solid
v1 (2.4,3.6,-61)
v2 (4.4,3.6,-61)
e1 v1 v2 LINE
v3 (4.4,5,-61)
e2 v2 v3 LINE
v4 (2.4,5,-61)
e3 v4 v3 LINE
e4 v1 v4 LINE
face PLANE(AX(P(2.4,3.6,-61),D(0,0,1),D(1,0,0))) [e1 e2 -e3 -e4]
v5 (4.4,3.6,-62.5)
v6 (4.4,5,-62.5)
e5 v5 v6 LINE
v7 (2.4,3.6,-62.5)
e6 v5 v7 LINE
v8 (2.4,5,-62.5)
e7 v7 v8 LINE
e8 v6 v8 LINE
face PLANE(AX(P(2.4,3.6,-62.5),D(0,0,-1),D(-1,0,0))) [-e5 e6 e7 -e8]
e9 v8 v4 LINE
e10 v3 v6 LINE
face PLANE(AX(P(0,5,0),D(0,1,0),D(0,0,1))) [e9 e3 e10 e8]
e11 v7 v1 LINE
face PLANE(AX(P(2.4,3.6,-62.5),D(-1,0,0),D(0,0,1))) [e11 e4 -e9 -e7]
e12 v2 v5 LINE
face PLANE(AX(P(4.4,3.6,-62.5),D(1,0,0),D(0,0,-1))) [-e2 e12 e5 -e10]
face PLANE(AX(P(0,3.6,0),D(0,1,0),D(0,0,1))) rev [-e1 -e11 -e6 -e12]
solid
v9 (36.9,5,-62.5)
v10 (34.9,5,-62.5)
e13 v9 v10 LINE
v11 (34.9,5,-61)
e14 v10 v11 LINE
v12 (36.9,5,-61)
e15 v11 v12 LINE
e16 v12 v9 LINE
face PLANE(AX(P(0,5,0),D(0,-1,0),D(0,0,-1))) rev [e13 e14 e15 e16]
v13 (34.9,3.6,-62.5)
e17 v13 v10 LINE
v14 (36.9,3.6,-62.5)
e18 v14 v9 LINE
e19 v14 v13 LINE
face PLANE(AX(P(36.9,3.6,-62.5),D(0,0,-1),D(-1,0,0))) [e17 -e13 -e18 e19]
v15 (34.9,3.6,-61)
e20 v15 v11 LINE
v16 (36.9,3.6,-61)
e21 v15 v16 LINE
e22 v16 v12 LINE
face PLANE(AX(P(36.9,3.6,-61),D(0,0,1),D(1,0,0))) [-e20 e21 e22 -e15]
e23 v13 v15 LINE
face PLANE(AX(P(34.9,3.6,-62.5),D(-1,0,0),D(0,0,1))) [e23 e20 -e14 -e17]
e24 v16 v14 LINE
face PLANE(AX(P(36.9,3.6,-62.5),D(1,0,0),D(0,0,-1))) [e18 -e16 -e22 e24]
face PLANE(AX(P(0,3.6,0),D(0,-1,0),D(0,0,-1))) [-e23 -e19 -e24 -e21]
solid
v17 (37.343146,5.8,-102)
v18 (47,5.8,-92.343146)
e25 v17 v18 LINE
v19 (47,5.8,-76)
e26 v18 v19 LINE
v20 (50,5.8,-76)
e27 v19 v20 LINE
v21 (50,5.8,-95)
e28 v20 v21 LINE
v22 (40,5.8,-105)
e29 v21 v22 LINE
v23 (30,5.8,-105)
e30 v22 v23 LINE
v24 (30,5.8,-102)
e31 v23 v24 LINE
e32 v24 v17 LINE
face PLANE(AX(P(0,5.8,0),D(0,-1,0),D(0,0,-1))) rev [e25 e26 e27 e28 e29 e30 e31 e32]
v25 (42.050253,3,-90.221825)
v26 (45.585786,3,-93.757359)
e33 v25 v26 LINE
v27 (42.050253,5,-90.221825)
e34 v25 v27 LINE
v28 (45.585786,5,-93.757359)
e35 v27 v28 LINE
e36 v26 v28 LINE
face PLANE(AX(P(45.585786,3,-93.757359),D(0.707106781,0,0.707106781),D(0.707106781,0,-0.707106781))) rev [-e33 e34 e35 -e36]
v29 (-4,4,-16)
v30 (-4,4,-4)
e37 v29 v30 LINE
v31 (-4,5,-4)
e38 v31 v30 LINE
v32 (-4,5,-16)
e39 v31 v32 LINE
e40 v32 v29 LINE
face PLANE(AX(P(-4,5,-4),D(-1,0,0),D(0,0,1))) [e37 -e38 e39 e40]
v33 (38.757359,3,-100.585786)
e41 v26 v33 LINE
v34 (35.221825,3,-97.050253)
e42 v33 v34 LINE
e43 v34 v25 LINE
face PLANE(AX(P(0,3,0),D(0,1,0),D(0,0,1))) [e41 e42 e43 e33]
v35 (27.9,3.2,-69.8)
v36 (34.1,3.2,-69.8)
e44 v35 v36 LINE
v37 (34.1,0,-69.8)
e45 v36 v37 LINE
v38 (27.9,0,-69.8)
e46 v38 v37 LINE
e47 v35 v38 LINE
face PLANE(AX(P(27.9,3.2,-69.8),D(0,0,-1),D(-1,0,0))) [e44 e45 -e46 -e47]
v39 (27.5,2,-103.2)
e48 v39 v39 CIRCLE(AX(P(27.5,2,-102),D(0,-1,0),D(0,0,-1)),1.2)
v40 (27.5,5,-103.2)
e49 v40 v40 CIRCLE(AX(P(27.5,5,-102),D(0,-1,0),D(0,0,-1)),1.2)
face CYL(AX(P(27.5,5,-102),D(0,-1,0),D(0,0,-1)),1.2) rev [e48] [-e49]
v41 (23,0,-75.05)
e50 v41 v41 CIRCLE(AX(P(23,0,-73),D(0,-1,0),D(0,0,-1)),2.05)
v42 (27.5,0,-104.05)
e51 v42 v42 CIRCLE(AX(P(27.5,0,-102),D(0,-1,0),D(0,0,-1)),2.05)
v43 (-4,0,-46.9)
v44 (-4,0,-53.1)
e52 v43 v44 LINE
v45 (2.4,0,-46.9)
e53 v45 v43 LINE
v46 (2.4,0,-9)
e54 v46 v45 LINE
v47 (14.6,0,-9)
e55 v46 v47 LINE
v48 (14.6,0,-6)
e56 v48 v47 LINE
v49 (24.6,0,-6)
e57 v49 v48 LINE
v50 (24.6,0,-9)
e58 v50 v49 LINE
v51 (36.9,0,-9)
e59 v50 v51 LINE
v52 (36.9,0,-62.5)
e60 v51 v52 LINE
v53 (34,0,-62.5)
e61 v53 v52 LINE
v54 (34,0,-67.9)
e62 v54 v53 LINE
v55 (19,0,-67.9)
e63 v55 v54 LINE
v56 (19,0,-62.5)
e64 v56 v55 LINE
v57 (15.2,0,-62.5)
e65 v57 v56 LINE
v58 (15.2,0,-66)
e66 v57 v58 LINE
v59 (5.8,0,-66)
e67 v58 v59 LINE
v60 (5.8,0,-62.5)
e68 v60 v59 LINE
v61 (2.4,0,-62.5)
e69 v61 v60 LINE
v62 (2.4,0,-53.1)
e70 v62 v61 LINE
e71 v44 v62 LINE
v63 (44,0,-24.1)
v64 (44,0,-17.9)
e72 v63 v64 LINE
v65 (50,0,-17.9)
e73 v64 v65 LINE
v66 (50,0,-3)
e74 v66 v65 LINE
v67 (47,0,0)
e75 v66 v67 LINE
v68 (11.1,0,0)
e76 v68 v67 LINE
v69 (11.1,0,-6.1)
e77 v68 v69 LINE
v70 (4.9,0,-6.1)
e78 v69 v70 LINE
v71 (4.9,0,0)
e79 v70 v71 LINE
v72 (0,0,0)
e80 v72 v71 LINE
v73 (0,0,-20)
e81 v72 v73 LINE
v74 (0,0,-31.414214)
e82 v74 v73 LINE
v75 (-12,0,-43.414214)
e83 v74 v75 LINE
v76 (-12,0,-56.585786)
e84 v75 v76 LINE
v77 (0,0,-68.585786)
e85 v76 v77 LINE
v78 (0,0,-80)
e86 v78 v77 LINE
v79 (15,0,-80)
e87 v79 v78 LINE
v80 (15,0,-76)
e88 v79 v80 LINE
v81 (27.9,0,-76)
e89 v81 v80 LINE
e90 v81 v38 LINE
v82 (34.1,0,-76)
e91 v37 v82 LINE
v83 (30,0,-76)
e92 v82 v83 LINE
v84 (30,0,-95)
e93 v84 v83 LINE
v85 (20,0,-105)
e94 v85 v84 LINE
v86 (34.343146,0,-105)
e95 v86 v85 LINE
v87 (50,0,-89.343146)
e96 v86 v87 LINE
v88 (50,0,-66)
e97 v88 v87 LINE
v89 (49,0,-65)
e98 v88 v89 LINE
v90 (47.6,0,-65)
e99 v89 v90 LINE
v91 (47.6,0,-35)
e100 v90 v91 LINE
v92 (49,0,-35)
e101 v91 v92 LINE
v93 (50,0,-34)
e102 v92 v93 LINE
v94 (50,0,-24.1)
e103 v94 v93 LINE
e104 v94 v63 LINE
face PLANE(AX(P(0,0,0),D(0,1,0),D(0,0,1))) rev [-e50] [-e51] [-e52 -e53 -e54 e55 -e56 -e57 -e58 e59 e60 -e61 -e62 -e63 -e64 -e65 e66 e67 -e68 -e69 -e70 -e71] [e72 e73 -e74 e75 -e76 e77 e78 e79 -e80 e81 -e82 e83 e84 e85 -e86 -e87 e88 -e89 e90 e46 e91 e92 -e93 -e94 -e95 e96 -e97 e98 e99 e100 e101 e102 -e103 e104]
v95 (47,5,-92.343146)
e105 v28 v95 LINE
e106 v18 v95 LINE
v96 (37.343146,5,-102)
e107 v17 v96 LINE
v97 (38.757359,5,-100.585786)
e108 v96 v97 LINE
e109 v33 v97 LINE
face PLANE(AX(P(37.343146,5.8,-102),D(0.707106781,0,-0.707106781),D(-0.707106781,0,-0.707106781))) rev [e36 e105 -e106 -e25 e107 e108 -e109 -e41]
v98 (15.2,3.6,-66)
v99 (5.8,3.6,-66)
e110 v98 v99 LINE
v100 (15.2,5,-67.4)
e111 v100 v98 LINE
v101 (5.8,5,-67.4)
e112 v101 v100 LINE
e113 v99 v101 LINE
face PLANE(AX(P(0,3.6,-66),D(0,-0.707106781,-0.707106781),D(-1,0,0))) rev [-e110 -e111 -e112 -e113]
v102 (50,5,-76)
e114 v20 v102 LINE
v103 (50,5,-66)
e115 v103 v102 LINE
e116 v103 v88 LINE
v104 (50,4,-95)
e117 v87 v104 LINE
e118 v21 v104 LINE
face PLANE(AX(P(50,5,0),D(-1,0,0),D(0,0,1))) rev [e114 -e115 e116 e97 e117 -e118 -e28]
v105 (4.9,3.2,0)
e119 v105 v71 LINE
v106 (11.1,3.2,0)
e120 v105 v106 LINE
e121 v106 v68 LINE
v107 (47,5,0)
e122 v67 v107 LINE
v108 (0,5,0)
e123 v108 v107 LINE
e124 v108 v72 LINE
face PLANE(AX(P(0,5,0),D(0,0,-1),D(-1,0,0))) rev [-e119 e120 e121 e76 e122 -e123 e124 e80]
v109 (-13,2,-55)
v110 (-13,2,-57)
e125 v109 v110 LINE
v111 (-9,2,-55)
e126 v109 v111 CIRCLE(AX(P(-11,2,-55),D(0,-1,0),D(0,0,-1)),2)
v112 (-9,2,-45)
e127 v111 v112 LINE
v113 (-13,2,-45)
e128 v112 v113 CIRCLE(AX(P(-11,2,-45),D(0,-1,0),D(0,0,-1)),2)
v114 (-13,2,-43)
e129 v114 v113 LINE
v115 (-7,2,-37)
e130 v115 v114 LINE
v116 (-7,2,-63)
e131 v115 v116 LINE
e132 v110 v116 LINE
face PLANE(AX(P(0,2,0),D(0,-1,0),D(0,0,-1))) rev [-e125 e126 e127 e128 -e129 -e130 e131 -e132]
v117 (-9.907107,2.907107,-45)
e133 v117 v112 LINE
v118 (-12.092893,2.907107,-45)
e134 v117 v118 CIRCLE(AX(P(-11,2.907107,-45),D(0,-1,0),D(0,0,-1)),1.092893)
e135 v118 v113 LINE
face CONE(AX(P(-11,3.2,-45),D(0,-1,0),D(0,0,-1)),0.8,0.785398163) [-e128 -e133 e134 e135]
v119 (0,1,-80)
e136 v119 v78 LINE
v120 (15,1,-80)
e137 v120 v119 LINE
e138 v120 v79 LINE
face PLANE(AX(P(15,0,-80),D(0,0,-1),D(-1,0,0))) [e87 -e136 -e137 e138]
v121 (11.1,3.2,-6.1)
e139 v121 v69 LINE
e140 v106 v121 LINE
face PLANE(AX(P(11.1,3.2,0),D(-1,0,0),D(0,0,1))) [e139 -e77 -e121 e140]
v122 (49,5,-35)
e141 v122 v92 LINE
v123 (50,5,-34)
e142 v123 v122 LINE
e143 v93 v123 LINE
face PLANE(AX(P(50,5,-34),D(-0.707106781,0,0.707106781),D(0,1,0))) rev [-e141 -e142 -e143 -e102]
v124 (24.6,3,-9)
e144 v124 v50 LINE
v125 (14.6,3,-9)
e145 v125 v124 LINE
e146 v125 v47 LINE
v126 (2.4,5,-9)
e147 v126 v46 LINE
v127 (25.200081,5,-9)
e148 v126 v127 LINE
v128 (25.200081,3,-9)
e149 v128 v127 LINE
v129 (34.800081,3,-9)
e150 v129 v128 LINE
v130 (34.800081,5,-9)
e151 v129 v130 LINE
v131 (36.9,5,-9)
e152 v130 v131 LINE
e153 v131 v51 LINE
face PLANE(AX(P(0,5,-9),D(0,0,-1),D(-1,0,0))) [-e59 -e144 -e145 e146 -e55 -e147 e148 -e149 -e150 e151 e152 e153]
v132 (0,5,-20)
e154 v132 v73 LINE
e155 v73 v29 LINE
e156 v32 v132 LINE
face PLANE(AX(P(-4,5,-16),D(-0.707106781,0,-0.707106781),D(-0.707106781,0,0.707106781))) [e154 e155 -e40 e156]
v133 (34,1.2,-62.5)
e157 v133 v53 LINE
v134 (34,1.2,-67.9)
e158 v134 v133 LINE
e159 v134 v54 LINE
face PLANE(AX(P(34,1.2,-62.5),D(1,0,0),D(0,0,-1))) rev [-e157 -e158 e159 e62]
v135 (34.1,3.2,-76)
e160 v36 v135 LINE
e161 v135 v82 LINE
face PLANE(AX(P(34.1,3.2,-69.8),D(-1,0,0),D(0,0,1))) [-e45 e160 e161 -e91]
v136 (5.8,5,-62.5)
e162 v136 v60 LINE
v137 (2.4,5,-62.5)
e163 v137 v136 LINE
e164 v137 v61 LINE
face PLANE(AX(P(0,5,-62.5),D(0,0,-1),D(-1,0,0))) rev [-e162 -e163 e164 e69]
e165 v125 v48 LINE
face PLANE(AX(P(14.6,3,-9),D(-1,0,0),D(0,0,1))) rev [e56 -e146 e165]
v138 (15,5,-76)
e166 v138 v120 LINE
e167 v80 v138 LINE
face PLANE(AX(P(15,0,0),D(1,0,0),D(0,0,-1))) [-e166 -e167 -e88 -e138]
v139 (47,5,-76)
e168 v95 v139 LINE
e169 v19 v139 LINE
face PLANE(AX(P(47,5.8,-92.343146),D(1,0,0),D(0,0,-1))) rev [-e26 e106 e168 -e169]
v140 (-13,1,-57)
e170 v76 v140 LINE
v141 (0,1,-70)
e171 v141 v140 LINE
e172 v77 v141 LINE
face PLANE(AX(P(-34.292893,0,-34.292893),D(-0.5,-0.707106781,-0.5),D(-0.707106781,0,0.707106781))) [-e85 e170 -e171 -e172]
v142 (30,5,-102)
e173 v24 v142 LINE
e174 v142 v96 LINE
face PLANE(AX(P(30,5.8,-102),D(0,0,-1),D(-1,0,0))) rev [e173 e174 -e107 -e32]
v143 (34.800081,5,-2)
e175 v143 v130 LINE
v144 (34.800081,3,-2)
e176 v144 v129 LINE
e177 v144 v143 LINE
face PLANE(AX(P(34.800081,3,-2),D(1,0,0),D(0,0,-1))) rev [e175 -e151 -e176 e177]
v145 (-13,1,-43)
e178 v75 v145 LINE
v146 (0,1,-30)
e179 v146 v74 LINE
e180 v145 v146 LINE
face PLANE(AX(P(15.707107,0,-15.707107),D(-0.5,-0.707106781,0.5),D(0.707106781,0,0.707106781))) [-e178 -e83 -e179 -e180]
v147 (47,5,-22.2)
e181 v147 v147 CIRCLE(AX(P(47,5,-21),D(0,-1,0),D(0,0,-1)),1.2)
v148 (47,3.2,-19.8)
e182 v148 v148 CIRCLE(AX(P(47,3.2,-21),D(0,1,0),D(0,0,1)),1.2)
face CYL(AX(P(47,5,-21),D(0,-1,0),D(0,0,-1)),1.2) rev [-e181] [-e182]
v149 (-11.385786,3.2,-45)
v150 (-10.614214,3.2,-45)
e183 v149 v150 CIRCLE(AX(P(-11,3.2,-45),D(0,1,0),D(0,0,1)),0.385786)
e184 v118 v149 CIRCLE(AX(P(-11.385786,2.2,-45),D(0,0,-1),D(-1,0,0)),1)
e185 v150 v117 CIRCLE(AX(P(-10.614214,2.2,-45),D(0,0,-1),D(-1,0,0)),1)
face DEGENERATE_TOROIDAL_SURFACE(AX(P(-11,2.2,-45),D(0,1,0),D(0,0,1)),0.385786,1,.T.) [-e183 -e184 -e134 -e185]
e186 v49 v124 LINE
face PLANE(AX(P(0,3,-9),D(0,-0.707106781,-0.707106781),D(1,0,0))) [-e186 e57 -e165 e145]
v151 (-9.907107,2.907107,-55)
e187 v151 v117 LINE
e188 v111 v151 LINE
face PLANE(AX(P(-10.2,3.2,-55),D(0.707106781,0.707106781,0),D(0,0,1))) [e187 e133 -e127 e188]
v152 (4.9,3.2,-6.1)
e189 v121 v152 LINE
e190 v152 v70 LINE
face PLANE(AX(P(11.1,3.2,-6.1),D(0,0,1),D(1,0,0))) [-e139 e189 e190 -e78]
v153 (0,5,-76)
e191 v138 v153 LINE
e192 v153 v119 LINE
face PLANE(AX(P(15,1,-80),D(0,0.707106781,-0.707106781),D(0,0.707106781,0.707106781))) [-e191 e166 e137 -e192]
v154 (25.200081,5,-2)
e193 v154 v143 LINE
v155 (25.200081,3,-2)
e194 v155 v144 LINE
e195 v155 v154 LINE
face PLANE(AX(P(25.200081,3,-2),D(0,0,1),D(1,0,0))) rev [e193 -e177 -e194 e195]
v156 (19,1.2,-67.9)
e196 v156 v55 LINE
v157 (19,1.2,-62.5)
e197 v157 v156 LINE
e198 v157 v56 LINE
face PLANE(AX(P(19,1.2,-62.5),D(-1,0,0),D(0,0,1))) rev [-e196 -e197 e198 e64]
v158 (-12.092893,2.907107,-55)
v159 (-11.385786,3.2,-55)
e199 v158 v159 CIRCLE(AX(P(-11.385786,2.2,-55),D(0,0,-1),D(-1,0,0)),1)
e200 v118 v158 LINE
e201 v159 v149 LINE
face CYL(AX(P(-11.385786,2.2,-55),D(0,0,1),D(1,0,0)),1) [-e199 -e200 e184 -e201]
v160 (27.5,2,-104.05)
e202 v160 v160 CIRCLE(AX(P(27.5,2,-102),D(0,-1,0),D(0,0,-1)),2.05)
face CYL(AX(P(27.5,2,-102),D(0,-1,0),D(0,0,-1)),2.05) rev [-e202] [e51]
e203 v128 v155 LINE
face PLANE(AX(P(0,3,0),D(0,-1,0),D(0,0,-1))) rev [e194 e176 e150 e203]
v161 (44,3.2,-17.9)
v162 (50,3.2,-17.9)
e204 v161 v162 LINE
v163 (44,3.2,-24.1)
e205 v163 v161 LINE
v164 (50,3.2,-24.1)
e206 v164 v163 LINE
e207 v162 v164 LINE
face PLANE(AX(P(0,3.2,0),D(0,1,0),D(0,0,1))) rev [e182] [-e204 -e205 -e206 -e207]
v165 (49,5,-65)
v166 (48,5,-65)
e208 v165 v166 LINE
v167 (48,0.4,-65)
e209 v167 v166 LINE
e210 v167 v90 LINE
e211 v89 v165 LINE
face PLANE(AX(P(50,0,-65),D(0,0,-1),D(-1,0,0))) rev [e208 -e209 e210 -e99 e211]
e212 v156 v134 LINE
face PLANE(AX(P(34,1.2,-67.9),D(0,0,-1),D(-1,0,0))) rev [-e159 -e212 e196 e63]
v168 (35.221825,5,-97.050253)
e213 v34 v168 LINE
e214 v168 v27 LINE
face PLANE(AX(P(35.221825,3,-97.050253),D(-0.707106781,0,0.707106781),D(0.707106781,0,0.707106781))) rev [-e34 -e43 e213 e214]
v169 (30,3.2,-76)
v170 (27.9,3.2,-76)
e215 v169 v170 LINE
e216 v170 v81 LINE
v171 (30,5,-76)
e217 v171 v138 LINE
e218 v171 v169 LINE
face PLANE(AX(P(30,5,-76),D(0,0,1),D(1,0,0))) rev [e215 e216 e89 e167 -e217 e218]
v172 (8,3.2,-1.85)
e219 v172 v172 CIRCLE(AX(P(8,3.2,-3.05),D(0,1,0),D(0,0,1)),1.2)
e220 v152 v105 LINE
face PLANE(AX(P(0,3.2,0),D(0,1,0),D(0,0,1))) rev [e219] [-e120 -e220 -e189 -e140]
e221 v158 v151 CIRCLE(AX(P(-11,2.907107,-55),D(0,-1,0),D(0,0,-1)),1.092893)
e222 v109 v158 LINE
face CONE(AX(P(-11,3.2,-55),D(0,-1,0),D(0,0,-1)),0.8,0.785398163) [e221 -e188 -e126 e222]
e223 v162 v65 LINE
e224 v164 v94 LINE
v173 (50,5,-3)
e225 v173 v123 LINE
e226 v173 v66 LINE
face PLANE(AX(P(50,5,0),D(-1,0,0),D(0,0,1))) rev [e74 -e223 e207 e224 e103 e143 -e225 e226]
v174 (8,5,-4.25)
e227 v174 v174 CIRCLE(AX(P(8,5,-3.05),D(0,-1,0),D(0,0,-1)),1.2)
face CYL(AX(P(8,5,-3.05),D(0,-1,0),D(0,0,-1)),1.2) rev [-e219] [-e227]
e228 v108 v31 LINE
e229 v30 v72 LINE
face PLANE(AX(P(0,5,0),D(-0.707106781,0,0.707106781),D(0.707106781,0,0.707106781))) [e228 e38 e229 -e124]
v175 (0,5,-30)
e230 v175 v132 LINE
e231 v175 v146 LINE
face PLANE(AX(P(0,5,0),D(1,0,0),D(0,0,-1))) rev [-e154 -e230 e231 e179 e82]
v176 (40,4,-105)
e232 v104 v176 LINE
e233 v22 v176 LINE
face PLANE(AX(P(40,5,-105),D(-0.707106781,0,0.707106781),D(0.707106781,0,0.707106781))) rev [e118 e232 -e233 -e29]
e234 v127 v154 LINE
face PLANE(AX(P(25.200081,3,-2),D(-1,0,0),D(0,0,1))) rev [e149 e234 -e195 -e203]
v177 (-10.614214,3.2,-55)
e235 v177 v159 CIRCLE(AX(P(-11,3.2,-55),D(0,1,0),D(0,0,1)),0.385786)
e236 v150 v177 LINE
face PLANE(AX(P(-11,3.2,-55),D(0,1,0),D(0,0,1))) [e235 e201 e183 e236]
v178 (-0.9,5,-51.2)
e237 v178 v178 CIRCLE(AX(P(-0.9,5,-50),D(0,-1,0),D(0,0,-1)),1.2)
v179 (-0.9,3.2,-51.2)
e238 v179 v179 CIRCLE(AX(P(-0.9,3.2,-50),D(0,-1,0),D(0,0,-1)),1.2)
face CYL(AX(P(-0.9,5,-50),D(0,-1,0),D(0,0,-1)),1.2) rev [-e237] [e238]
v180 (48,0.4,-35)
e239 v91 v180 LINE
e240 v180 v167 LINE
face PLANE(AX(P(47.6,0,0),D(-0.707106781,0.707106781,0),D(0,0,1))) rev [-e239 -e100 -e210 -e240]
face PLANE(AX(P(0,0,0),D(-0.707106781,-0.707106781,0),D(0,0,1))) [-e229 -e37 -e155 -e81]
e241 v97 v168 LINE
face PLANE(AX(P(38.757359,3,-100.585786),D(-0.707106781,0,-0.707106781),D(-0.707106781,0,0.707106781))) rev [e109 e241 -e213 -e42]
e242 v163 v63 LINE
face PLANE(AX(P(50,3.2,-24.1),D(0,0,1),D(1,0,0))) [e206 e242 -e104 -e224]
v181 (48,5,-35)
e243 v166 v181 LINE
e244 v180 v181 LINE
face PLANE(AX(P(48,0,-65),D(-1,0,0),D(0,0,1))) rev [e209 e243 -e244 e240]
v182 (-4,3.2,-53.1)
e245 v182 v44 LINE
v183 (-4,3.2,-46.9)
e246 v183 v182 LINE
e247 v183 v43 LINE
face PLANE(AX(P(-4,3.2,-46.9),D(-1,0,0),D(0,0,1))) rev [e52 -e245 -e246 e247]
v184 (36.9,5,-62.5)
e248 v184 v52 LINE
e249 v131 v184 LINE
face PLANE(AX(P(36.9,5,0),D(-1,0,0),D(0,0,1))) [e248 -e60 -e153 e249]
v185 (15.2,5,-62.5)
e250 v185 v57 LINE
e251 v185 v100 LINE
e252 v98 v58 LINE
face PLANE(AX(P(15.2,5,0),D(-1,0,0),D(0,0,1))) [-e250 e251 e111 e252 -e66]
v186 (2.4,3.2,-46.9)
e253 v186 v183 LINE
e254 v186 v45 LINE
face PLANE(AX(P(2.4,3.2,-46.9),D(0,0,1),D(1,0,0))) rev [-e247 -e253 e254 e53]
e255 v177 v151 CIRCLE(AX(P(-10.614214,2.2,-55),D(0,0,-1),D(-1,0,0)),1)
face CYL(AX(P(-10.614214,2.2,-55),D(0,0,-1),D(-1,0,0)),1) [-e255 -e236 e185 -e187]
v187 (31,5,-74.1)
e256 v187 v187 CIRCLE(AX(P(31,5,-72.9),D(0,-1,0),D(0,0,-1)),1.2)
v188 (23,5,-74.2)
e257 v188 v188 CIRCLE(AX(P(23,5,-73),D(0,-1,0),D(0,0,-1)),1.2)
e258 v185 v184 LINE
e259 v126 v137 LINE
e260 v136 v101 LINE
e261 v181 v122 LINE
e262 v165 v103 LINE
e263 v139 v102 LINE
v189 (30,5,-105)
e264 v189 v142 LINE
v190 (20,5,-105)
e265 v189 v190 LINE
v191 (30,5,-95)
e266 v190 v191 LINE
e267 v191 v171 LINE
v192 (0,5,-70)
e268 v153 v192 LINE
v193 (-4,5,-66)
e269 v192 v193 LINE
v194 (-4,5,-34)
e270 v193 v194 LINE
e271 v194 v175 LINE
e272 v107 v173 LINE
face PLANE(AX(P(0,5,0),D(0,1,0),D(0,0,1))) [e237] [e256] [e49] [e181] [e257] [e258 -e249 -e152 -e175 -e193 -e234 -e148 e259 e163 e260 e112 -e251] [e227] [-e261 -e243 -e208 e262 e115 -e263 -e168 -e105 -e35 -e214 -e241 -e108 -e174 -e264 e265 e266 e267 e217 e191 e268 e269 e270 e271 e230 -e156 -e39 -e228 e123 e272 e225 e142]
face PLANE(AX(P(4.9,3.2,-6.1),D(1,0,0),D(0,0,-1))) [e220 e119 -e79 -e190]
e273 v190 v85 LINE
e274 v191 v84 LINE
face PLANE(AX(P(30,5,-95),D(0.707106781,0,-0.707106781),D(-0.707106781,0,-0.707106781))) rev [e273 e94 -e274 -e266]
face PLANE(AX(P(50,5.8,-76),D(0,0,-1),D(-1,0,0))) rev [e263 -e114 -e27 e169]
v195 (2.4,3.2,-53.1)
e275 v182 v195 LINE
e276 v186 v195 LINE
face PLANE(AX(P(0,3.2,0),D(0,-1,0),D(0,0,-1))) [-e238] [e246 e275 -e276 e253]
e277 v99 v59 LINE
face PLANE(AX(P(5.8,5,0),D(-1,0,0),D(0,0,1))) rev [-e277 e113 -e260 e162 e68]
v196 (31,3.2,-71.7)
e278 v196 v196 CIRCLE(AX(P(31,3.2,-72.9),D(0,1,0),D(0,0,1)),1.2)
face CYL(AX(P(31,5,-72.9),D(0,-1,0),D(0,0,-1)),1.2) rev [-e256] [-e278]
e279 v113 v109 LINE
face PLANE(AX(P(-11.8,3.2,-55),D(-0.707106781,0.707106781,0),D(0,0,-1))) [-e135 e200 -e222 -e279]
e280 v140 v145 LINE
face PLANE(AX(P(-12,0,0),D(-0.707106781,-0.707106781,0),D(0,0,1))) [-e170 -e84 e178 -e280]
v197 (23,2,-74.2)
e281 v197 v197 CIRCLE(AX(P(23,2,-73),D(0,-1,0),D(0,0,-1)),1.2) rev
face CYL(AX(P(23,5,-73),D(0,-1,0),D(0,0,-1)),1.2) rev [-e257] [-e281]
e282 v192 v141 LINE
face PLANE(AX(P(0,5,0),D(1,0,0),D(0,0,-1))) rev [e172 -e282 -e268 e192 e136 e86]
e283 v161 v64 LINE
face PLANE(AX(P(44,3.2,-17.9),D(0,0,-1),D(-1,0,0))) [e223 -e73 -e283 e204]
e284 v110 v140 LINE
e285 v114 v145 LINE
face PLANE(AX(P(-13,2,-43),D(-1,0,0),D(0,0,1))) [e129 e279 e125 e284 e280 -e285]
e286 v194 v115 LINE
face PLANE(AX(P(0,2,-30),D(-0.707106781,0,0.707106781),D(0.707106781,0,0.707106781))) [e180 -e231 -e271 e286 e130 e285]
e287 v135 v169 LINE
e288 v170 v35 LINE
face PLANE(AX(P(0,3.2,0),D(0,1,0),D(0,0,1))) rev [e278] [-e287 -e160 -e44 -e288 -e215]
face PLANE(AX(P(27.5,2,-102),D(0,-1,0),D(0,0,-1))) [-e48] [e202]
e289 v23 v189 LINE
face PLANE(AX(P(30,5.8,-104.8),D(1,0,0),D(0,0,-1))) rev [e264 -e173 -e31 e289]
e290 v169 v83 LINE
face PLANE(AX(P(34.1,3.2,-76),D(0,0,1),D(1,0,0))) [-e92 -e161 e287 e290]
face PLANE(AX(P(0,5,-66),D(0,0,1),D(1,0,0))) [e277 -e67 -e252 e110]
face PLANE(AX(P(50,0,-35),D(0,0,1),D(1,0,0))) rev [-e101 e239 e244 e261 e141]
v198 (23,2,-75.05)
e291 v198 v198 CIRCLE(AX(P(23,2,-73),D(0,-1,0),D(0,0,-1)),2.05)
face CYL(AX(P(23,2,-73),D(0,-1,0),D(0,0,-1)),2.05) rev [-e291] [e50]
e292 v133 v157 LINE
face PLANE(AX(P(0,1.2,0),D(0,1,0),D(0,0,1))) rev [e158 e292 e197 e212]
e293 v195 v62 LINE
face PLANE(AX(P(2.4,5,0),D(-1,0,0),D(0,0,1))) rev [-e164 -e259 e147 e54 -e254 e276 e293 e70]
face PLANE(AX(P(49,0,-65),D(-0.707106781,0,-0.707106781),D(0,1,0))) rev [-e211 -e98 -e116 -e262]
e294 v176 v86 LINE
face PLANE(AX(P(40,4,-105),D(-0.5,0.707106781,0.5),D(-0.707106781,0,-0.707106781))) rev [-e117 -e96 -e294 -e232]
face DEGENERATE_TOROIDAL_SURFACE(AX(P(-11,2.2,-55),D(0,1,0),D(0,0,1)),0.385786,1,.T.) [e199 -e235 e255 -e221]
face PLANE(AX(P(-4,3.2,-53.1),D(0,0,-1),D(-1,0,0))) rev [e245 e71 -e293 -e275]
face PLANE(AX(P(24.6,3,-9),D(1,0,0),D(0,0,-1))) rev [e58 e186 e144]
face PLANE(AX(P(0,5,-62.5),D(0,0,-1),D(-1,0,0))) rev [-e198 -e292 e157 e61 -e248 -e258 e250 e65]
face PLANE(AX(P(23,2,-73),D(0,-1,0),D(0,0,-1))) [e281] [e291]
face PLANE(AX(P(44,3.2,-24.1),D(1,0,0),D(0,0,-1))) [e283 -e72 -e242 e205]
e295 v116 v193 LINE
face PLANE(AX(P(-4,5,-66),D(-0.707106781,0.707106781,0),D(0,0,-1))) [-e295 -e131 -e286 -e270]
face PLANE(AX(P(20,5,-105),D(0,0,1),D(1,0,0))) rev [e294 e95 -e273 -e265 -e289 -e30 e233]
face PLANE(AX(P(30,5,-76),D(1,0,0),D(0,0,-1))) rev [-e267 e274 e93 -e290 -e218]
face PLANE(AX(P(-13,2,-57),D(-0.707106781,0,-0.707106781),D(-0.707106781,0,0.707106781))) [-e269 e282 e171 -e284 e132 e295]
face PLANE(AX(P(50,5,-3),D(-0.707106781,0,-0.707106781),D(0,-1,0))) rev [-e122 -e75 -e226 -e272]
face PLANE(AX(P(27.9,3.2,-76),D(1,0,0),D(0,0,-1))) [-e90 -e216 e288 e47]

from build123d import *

# Parameters (mm, degrees)
EXTRUDE_1_DEPTH      = 5
CUT_EXTRUDE_1_DEPTH  = 5
CHAMFER_1_SIZE       = 1.4
SKETCH_3_W           = 2
SKETCH_3_H           = 1.5
EXTRUDE_2_DEPTH      = 1.4
EXTRUDE_2_2_DEPTH    = 1.4
CHAMFER_2_SIZE       = 4
EXTRUDE_4_DEPTH      = 2
EXTRUDE_5_DEPTH      = 3
CHAMFER_4_SIZE       = 3
EXTRUDE_6_DEPTH      = 5
CHAMFER_5_SIZE       = 4
SKETCH_9_R           = 2.05
CUT_EXTRUDE_2_DEPTH  = 2
SKETCH_10_R          = 1.2
CUT_EXTRUDE_3_DEPTH  = 3
CHAMFER_6_SIZE       = 1
CHAMFER_7_SIZE       = 3
SKETCH_11_W          = 2
SKETCH_11_H          = 30
CUT_EXTRUDE_4_DEPTH  = 117.404467268
SKETCH_12_W          = 6
SKETCH_12_H          = 6.2
SKETCH_12_W_2        = 6.2
SKETCH_12_H_2        = 6.1
SKETCH_12_W_3        = 6.4
CUT_EXTRUDE_5_DEPTH  = 3.2
SKETCH_12_4_R        = 1.2
CUT_EXTRUDE_6_DEPTH  = 117.404467268
SKETCH_13_W          = 9.6
SKETCH_13_H          = 7
CUT_EXTRUDE_7_DEPTH  = 2
SKETCH_14_W          = 10
SKETCH_14_H          = 3
CUT_EXTRUDE_8_DEPTH  = 3
CHAMFER_8_SIZE       = 3
EXTRUDE_7_DEPTH      = 15
CHAMFER_9_SIZE       = 1
SKETCH_16_W          = 15
SKETCH_16_H          = 5.4
CUT_EXTRUDE_9_DEPTH  = 1.2
EXTRUDE_8_DEPTH      = 1.2
CHAMFER_10_SIZE      = 1.2
FILLET_START         = -55.913222165
FILLET_1_DEPTH       = 11.82644433
FILLET_1_2_ANGLE     = 180
FILLET_1_3_ANGLE     = 180
SKETCH_18_R          = 1.2
CUT_EXTRUDE_10_DEPTH = 117.404467268
SKETCH_18_3_R        = 2.05
CUT_EXTRUDE_11_DEPTH = 2
EXTRUDE_3_DEPTH      = 0.8
CUT_EXTRUDE_12_DEPTH = 2
CHAMFER_11_SIZE      = 0.4


with BuildPart() as part:
    # 草图1 → 凸台-拉伸1 (new body)
    with BuildSketch(Plane(origin=(0, 0, 0), x_dir=(1, 0, 0), z_dir=(0, 1, 0))):
        Polygon((40, 105), (50, 95), (50, 0), (0, 0), (0, 76), (30, 76), (30, 95), (20, 105), align=None)
    extrude(amount=EXTRUDE_1_DEPTH)

    # 草图2 → 切除-拉伸1 (cut)
    with BuildSketch(Plane.XZ):
        Polygon((15.2, -62.5), (36.9, -62.5), (36.9, -9), (2.4, -9), (2.4, -62.5), (5.8, -62.5), (5.8, -66), (15.2, -66), align=None)
    extrude(amount=-CUT_EXTRUDE_1_DEPTH, mode=Mode.SUBTRACT)

    # 倒角1
    chamfer_1_edges = [part.edges().sort_by_distance(p)[0] for p in [
        (10.5, 5, -66),
    ]]
    chamfer(chamfer_1_edges, length=CHAMFER_1_SIZE)

    # 倒角2
    chamfer_2_edges = [part.edges().sort_by_distance(p)[0] for p in [
        (45, 0, -100),
    ]]
    chamfer(chamfer_2_edges, length=CHAMFER_2_SIZE)

    # 草图6 → 凸台-拉伸4 (add)
    with BuildSketch(Plane.XZ):
        Polygon((0, -70), (0, -30), (-13, -43), (-13, -57), align=None)
    extrude(amount=-EXTRUDE_4_DEPTH)

    # 草图7 → 凸台-拉伸5 (add)
    with BuildSketch(Plane(origin=(0, 2, 0), x_dir=(1, 0, 0), z_dir=(0, 1, 0))):
        Polygon((-4, 66), (-4, 34), (0, 30), (0, 70), align=None)
    extrude(amount=EXTRUDE_5_DEPTH)

    # 倒角4
    chamfer_4_edges = [part.edges().sort_by_distance(p)[0] for p in [
        (-4, 2, -50),
    ]]
    chamfer(chamfer_4_edges, length=CHAMFER_4_SIZE - 0.0001)  # a hair under: the kernel refuses the full size

    # 草图8 → 凸台-拉伸6 (add)
    with BuildSketch(Plane.XZ):
        Polygon((0, -20), (0, 0), (-4, -4), (-4, -16), align=None)
    extrude(amount=-EXTRUDE_6_DEPTH)

    # 倒角5
    chamfer_5_edges = [part.edges().sort_by_distance(p)[0] for p in [
        (-4, 0, -10),
    ]]
    chamfer(chamfer_5_edges, length=CHAMFER_5_SIZE)

    # 草图9 → 切除-拉伸2 (cut)
    with BuildSketch(Plane.XZ):
        with Locations(Location((27.5, -102, 0), (0, 0, 270))):
            Circle(SKETCH_9_R)
    extrude(amount=-CUT_EXTRUDE_2_DEPTH, mode=Mode.SUBTRACT)

    # 草图10 → 切除-拉伸3 (cut)
    with BuildSketch(Plane.XZ.offset(-2)):
        with Locations(Location((27.5, -102, 0), (0, 0, 270))):
            Circle(SKETCH_10_R)
    extrude(amount=-CUT_EXTRUDE_3_DEPTH, mode=Mode.SUBTRACT)

    # 倒角6
    chamfer_6_edges = [part.edges().sort_by_distance(p)[0] for p in [
        (-6.5, 0, -36.5),
        (-13, 0, -50),
        (-6.5, 0, -63.5),
    ]]
    chamfer(chamfer_6_edges, length=CHAMFER_6_SIZE)

    # 倒角7
    chamfer_7_edges = [part.edges().sort_by_distance(p)[0] for p in [
        (50, 2.5, 0),
    ]]
    chamfer(chamfer_7_edges, length=CHAMFER_7_SIZE)

    # 草图11 → 切除-拉伸4 (cut, through all)
    with BuildSketch(Plane(origin=(0, 5, 0), x_dir=(1, 0, 0), z_dir=(0, 1, 0))):
        with Locations((49, 50)):
            Rectangle(SKETCH_11_W, SKETCH_11_H)
    extrude(amount=-CUT_EXTRUDE_4_DEPTH, mode=Mode.SUBTRACT)

    # 草图12 → 切除-拉伸5 (cut)
    with BuildSketch(Plane.XZ):
        with Locations((47, -21)):
            Rectangle(SKETCH_12_W, SKETCH_12_H)
        with Locations((8, -3.05)):
            Rectangle(SKETCH_12_W_2, SKETCH_12_H_2)
        Polygon((27.9, -76), (27.9, -69.8), (34.1, -69.8), (34.1, -76), (30, -76), align=None)
        with Locations((-0.8, -50)):
            Rectangle(SKETCH_12_W_3, SKETCH_12_H)
    extrude(amount=-CUT_EXTRUDE_5_DEPTH, mode=Mode.SUBTRACT)

    # 草图12<4> → 切除-拉伸6 (cut, through all)
    with BuildSketch(Plane.XZ):
        with Locations(Location((8, -3.05, 0), (0, 0, 270))):
            Circle(SKETCH_12_4_R)
        with Locations(Location((47, -21, 0), (0, 0, 270))):
            Circle(SKETCH_12_4_R)
        with Locations(Location((31, -72.9, 0), (0, 0, 270))):
            Circle(SKETCH_12_4_R)
        with Locations(Location((-0.9, -50, 0), (0, 0, 270))):
            Circle(SKETCH_12_4_R)
    extrude(amount=-CUT_EXTRUDE_6_DEPTH, mode=Mode.SUBTRACT)

    # 草图13 → 切除-拉伸7 (cut)
    with BuildSketch(Plane(origin=(0, 5, 0), x_dir=(1, 0, 0), z_dir=(0, 1, 0))):
        with Locations((30.000080746, 5.5)):
            Rectangle(SKETCH_13_W, SKETCH_13_H)
    extrude(amount=-CUT_EXTRUDE_7_DEPTH, mode=Mode.SUBTRACT)

    # 草图14 → 切除-拉伸8 (cut)
    with BuildSketch(Plane.XZ):
        with Locations((19.6, -7.5)):
            Rectangle(SKETCH_14_W, SKETCH_14_H)
    extrude(amount=-CUT_EXTRUDE_8_DEPTH, mode=Mode.SUBTRACT)

    # 倒角8
    chamfer_8_edges = [part.edges().sort_by_distance(p)[0] for p in [
        (19.6, 3, -6),
    ]]
    chamfer(chamfer_8_edges, length=CHAMFER_8_SIZE - 0.0001)  # a hair under: the kernel refuses the full size

    # 草图15 → 凸台-拉伸7 (add)
    with BuildSketch(Plane.ZY):
        Polygon((-76, 5), (-76, 0), (-80, 0), (-80, 1), align=None)
    extrude(amount=-EXTRUDE_7_DEPTH)

    # 倒角9
    chamfer_9_edges = [part.edges().sort_by_distance(p)[0] for p in [
        (50, 2.5, -65),
        (50, 2.5, -35),
    ]]
    chamfer(chamfer_9_edges, length=CHAMFER_9_SIZE)

    # 草图16 → 切除-拉伸9 (cut)
    with BuildSketch(Plane.XZ):
        with Locations((26.5, -65.2)):
            Rectangle(SKETCH_16_W, SKETCH_16_H)
    extrude(amount=-CUT_EXTRUDE_9_DEPTH, mode=Mode.SUBTRACT)

    # 草图17 → 凸台-拉伸8 (add)
    with BuildSketch(Plane(origin=(0, 2, 0), x_dir=(1, 0, 0), z_dir=(0, 1, 0))):
        with BuildLine():
            Line((-10.2, 55), (-10.2, 45))
            ThreePointArc((-10.2, 45), (-11, 44.2), (-11.8, 45))
            Line((-11.8, 45), (-11.8, 55))
            ThreePointArc((-11.8, 55), (-11, 55.8), (-10.2, 55))
        make_face()
    extrude(amount=EXTRUDE_8_DEPTH)

    # 倒角10
    chamfer_10_edges = [part.edges().sort_by_distance(p)[0] for p in [
        (-10.2, 2, -50),
        (-11, 2, -55.8),
        (-11, 2, -44.2),
        (-11.8, 2, -50),
    ]]
    chamfer(chamfer_10_edges, length=CHAMFER_10_SIZE - 0.0001)  # a hair under: the kernel refuses the full size

    # 圆角1: read off the stored shape, not the designer's step
    # 圆角1 outline → 圆角1 (cut)
    with BuildSketch(Plane.XY.offset(FILLET_START)):
        with BuildLine():
            Line((-10.2, 3.2), (-10.614213562, 3.2))
            ThreePointArc((-10.614213562, 3.2), (-10.23153013, 3.123879533), (-9.907106781, 2.907106781))
            Line((-9.907106781, 2.907106781), (-10.2, 3.2))
        make_face()
        with BuildLine():
            ThreePointArc((-12.092893219, 2.907106781), (-11.76846987, 3.123879533), (-11.385786438, 3.2))
            Line((-11.385786438, 3.2), (-11.8, 3.2))
            Line((-11.8, 3.2), (-12.092893219, 2.907106781))
        make_face()
    extrude(amount=FILLET_1_DEPTH, mode=Mode.SUBTRACT)

    # Fillet 1 2 outline → Fillet 1 2 (revolve, cut)
    with BuildSketch(Plane(origin=(-11, 0, -45), x_dir=(-1, 0, 0), z_dir=(0, 0, -1))):
        with BuildLine():
            ThreePointArc((0.385786438, 3.2), (0.76846987, 3.123879533), (1.092893219, 2.907106781))
            Line((1.092893219, 2.907106781), (1.092893219, 3.2))
            Line((1.092893219, 3.2), (0.385786438, 3.2))
        make_face()
    revolve(axis=Axis((-11, 0, -45), (0, 1, 0)), revolution_arc=FILLET_1_2_ANGLE, mode=Mode.SUBTRACT)

    # Fillet 1 3 outline → Fillet 1 3 (revolve, cut)
    with BuildSketch(Plane(origin=(-11, 0, -55), x_dir=(1, 0, 0), z_dir=(0, 0, 1))):
        with BuildLine():
            ThreePointArc((0.385786438, 3.2), (0.76846987, 3.123879533), (1.092893219, 2.907106781))
            Line((1.092893219, 2.907106781), (1.092893219, 3.2))
            Line((1.092893219, 3.2), (0.385786438, 3.2))
        make_face()
    revolve(axis=Axis((-11, 0, -55), (0, 1, 0)), revolution_arc=FILLET_1_3_ANGLE, mode=Mode.SUBTRACT)

    # 草图18 → 切除-拉伸10 (cut, through all)
    with BuildSketch(Plane.XZ):
        with Locations(Location((23, -73, 0), (0, 0, 270))):
            Circle(SKETCH_18_R)
    extrude(amount=-CUT_EXTRUDE_10_DEPTH, mode=Mode.SUBTRACT)

    # 草图18<3> → 切除-拉伸11 (cut)
    with BuildSketch(Plane.XZ):
        with Locations(Location((23, -73, 0), (0, 0, 270))):
            Circle(SKETCH_18_3_R)
    extrude(amount=-CUT_EXTRUDE_11_DEPTH, mode=Mode.SUBTRACT)

    # 草图5 → 凸台-拉伸3 (add)
    with BuildSketch(Plane(origin=(0, 5, 0), x_dir=(1, 0, 0), z_dir=(0, 1, 0))):
        Polygon((40, 105), (30, 105), (30, 104.8), (30, 102), (37.343145751, 102), (47, 92.343145751), (47, 76), (50, 76), (50, 95), align=None)
    extrude(amount=EXTRUDE_3_DEPTH)

    # 草图19 → 切除-拉伸12 (cut)
    with BuildSketch(Plane(origin=(0, 5, 0), x_dir=(1, 0, 0), z_dir=(0, 1, 0))):
        Polygon((38.757359313, 100.585786438), (45.585786438, 93.757359313), (42.050252532, 90.221825407), (35.221825407, 97.050252532), align=None)
    extrude(amount=-CUT_EXTRUDE_12_DEPTH, mode=Mode.SUBTRACT)

    # 倒角11
    chamfer_11_edges = [part.edges().sort_by_distance(p)[0] for p in [
        (48, 0, -50),
    ]]
    chamfer(chamfer_11_edges, length=CHAMFER_11_SIZE)


with BuildPart() as body_2:
    # 草图3 → 凸台-拉伸2 (new body)
    with BuildSketch(Plane(origin=(0, 5, 0), x_dir=(1, 0, 0), z_dir=(0, 1, 0))):
        with Locations((3.4, 61.75)):
            Rectangle(SKETCH_3_W, SKETCH_3_H)
    extrude(amount=-EXTRUDE_2_DEPTH)


with BuildPart() as body_3:
    # 草图3 → Extrude 2 2 (new body)
    with BuildSketch(Plane(origin=(0, 5, 0), x_dir=(1, 0, 0), z_dir=(0, 1, 0))):
        with Locations((35.9, 61.75)):
            Rectangle(SKETCH_3_W, SKETCH_3_H)
    extrude(amount=-EXTRUDE_2_2_DEPTH)


solid = Compound([part.part, body_2.part, body_3.part])
